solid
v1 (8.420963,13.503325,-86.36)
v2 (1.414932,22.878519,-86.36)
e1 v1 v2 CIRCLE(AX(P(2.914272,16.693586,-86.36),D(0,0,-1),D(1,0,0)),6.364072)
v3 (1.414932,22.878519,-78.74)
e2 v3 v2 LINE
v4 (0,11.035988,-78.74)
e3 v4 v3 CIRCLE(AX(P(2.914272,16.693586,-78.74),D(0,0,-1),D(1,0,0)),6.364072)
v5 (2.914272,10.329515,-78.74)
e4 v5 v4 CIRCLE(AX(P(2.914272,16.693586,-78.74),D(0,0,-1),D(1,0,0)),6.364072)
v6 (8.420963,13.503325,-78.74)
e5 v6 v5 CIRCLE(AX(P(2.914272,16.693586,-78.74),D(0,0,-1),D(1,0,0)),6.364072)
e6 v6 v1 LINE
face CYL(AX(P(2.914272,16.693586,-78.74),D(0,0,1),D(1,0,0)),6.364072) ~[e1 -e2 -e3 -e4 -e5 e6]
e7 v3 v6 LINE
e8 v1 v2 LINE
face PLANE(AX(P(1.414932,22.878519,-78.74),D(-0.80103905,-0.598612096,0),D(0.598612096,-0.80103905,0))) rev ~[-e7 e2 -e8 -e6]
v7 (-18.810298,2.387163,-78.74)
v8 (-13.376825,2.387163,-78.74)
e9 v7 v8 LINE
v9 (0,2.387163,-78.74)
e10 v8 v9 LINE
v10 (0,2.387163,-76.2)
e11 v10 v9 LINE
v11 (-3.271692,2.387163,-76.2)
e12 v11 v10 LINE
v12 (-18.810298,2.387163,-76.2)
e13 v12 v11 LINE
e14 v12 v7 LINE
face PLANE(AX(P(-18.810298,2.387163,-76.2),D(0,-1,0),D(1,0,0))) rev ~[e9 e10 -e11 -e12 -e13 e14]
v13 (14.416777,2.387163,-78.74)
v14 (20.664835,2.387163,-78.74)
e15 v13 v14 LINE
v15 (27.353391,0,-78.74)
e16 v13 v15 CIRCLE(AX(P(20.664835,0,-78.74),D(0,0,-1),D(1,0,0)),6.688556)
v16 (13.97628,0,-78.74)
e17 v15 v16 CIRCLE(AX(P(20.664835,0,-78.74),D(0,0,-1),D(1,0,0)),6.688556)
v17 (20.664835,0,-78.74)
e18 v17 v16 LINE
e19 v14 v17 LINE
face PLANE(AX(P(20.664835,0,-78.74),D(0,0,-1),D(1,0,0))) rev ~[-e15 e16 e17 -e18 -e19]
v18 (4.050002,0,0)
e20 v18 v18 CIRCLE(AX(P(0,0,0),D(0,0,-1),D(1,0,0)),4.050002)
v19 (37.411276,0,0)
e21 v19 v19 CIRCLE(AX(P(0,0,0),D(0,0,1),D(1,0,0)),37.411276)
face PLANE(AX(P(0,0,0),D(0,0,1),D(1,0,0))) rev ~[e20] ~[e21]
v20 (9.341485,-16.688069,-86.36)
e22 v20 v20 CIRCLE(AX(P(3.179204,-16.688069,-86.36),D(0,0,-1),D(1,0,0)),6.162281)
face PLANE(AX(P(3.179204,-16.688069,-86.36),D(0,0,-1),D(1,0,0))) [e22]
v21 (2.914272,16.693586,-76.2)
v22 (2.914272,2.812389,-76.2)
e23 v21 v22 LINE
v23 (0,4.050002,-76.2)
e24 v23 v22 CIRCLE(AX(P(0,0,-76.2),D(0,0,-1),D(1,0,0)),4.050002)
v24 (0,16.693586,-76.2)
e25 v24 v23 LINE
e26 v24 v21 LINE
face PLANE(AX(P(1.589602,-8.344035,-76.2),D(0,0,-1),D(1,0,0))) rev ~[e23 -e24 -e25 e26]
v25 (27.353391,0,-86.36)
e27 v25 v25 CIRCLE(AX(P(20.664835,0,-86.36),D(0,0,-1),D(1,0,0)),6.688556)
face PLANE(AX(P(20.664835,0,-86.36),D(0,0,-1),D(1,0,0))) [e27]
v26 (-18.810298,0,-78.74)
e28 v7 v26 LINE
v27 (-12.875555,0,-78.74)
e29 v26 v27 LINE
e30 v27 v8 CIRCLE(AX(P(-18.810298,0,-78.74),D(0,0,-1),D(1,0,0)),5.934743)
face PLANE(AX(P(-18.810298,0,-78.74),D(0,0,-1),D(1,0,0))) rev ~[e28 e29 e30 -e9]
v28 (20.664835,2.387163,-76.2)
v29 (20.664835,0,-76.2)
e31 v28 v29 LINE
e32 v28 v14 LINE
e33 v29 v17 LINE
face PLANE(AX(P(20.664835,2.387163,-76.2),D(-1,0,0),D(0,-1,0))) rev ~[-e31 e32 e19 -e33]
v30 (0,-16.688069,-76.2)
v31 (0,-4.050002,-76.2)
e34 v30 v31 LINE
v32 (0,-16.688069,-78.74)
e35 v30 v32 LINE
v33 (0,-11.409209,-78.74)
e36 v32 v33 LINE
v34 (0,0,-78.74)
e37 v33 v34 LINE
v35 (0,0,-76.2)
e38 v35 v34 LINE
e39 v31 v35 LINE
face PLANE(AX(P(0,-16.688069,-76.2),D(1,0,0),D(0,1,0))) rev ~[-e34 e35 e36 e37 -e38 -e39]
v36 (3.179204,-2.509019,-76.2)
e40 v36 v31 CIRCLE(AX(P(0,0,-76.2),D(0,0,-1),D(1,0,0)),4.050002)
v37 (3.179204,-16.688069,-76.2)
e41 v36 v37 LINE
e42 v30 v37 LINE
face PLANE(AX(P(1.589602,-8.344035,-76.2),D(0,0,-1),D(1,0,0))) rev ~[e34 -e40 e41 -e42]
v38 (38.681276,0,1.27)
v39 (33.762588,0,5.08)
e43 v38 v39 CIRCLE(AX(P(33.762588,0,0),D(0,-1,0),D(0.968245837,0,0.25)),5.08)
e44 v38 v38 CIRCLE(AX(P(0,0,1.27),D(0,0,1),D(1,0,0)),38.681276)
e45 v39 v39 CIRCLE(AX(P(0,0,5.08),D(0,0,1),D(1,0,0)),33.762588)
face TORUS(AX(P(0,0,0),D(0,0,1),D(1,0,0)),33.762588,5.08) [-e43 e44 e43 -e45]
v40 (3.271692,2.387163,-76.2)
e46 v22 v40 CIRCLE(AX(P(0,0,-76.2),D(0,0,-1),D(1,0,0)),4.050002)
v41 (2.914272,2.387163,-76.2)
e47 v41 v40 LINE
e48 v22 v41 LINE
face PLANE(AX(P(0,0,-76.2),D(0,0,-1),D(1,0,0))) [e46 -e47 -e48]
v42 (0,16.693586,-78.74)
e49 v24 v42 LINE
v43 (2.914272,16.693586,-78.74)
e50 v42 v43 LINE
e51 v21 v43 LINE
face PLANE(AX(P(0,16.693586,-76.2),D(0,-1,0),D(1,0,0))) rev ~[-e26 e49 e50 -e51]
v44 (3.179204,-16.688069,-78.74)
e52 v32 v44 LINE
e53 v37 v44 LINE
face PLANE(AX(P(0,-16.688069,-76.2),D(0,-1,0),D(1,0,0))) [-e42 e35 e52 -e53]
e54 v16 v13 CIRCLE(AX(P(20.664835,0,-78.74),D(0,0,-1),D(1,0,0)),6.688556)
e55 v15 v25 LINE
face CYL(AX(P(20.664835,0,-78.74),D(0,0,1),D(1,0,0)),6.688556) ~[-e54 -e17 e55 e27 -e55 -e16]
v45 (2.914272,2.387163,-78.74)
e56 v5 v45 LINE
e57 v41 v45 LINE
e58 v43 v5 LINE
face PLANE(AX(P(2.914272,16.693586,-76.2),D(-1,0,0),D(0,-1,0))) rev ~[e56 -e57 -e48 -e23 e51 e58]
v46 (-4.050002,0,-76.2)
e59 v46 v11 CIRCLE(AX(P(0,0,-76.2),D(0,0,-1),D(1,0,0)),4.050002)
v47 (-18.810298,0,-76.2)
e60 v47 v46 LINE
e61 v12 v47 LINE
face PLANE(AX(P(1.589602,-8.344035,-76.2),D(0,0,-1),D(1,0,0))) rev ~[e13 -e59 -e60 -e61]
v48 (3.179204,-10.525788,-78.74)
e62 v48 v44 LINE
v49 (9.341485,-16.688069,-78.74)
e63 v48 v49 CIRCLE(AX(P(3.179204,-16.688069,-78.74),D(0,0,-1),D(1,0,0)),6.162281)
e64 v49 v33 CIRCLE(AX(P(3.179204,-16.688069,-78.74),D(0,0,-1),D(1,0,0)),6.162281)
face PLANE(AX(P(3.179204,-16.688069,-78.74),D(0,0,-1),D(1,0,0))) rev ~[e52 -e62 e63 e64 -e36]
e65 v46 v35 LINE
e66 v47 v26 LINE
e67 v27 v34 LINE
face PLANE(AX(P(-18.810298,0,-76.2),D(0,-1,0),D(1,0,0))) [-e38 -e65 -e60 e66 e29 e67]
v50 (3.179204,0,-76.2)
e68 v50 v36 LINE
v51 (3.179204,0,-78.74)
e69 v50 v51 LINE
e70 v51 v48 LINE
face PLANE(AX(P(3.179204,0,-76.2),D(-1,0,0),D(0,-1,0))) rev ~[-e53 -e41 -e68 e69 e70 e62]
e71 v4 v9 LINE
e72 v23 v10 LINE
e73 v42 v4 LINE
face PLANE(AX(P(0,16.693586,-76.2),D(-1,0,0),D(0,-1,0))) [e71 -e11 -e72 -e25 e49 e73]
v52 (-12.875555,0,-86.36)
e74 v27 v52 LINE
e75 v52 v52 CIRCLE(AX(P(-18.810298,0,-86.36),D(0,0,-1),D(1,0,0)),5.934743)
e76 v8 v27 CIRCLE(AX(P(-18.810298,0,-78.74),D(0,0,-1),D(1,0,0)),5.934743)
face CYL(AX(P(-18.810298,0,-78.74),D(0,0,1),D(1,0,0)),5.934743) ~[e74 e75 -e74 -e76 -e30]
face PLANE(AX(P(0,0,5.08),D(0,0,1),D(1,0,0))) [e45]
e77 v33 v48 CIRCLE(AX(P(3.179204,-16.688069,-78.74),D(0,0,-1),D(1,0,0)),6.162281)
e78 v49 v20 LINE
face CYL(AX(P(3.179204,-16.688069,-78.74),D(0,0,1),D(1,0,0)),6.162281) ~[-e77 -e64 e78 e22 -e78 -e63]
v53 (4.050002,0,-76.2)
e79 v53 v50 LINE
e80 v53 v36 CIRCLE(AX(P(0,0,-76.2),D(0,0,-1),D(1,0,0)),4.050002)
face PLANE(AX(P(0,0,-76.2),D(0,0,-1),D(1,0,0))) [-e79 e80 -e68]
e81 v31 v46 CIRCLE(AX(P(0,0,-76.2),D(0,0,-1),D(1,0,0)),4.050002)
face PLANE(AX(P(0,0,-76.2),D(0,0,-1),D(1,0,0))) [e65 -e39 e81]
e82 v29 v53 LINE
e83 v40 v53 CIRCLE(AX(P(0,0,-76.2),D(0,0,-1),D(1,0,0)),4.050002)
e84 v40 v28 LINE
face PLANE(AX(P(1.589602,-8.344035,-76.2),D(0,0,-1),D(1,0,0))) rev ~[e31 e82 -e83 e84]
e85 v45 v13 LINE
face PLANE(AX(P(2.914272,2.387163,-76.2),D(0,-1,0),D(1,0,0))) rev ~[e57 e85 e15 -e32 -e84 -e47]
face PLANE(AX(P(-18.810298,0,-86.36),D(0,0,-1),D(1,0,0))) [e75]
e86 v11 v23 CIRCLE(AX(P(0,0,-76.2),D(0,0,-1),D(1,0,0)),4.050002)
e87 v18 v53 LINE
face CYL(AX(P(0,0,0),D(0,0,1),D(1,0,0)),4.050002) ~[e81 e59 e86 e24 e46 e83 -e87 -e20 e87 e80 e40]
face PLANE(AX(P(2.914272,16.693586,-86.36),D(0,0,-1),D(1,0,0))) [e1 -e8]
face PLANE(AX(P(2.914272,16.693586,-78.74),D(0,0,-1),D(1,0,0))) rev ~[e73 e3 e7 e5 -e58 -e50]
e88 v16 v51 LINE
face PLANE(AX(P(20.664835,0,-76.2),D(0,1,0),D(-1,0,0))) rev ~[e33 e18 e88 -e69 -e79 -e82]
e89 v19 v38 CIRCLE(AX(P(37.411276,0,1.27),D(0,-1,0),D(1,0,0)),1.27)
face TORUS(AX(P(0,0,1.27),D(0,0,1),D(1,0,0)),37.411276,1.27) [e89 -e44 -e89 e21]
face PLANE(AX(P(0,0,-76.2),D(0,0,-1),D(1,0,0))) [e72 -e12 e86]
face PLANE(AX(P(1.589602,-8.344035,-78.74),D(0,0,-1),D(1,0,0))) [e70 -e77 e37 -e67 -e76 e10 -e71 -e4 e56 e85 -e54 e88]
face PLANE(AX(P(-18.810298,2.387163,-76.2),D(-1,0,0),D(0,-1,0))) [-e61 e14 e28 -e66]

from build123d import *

# Parameters (mm, degrees)
F0_R      = 38.6812763638
F1_DEPTH  = 5.08
F2_R      = 4.0500019282
F3_DEPTH  = 76.2
F4_W      = 3.1792044174
F4_H      = 16.6880693287
F4_W_2    = 18.8102982938
F4_H_2    = 2.3871629965
F4_W_3    = 2.9142722487
F4_H_3    = 14.3064234871
F5_DEPTH  = 2.54
F6_R      = 1.27
F8_R      = 6.6885556935
F8_R_2    = 5.9347433367
F8_R_3    = 6.3640715152
F8_R_4    = 6.1622808629
F9_DEPTH  = 7.62
F11_DEPTH = 7.621


# Not quite as in the source:
# - a fillet or chamfer that OpenCascade refuses, or shapes differently, is made with other operations: its cross-section is extruded or revolved along the edge and cut away or added


with BuildPart() as f1:
    # F0 (on Top) → F1 (new body)
    with BuildSketch(Plane.XY):
        Circle(F0_R)
    extrude(amount=F1_DEPTH)

    # F2 (on face) → F3 (join)
    with BuildSketch(Plane(origin=(0, 0, 0), x_dir=(1, 0, 0), z_dir=(0, 0, -1))):
        Circle(F2_R)
    extrude(amount=F3_DEPTH)

    # F4 (on face) → F5 (join)
    with BuildSketch(Plane(origin=(0, 0, -76.2), x_dir=(1, 0, 0), z_dir=(0, 0, -1))):
        with Locations((1.5896022087, 8.3440346643)):
            Rectangle(F4_W, F4_H)
        Polygon((3.1792044174, 0), (0, 0), (0, -2.3871629965), (2.9142722487, -2.3871629965), (20.6648353487, -2.3871629965), (20.6648353487, 0), align=None)
        with Locations((-9.4051491469, -1.1935814982)):
            Rectangle(F4_W_2, F4_H_2)
        with Locations((1.4571361244, -9.54037474)):
            Rectangle(F4_W_3, F4_H_3)
    extrude(amount=F5_DEPTH)

    # F6
    f6_edges = [f1.edges().sort_by_distance(p)[0] for p in [
        (-38.681276, 0, 0),
    ]]
    fillet(f6_edges, radius=F6_R)

    # F7: fillet of radius 5.08 on 1 edges, made by hand

    # F7_s1 → F7_t2 (revolve, cut)
    with BuildSketch(Plane.XZ):
        with BuildLine():
            ThreePointArc((38.6812763638, 1.27), (36.8734394874, 4.0160926284), (33.7625875141, 5.08))
            Line((33.7625875141, 5.08), (33.7625875141, 5.1816))
            Line((33.7625875141, 5.1816), (38.6812763638, 5.1816))
            Line((38.6812763638, 5.1816), (38.7828763638, 5.08))
            ThreePointArc((38.7828763638, 5.08), (38.7828763638, 3.175), (38.7796501408, 1.2954))
            Line((38.7796501408, 1.2954), (38.6812763638, 1.27))
        make_face()
    revolve(axis=Axis((0, 0, 5.08), (0, 0, 1)), mode=Mode.SUBTRACT)

    # F8 (on face) → F9 (join)
    with BuildSketch(Plane(origin=(0, 0, -78.74), x_dir=(1, 0, 0), z_dir=(0, 0, -1))):
        with Locations((20.6648353487, 0)):
            Circle(F8_R)
        with Locations((-18.8102982938, 0)):
            Circle(F8_R_2)
        with Locations((2.9142722487, -16.6935864836)):
            Circle(F8_R_3)
        with Locations((3.1792044174, 16.6880693287)):
            Circle(F8_R_4)
    extrude(amount=F9_DEPTH)

    # F10 (on face) → F11 (cut, through all)
    with BuildSketch(Plane.XY.offset(-78.74)):
        Polygon((1.4149318504, 22.8785185463), (8.4209625868, 13.5033250881), (25.2221585853, 26.6414508232), (18.2112082839, 35.6629639864), (10.4142271803, 29.6036426698), align=None)
    extrude(amount=-F11_DEPTH, mode=Mode.SUBTRACT)


solid = f1.part
